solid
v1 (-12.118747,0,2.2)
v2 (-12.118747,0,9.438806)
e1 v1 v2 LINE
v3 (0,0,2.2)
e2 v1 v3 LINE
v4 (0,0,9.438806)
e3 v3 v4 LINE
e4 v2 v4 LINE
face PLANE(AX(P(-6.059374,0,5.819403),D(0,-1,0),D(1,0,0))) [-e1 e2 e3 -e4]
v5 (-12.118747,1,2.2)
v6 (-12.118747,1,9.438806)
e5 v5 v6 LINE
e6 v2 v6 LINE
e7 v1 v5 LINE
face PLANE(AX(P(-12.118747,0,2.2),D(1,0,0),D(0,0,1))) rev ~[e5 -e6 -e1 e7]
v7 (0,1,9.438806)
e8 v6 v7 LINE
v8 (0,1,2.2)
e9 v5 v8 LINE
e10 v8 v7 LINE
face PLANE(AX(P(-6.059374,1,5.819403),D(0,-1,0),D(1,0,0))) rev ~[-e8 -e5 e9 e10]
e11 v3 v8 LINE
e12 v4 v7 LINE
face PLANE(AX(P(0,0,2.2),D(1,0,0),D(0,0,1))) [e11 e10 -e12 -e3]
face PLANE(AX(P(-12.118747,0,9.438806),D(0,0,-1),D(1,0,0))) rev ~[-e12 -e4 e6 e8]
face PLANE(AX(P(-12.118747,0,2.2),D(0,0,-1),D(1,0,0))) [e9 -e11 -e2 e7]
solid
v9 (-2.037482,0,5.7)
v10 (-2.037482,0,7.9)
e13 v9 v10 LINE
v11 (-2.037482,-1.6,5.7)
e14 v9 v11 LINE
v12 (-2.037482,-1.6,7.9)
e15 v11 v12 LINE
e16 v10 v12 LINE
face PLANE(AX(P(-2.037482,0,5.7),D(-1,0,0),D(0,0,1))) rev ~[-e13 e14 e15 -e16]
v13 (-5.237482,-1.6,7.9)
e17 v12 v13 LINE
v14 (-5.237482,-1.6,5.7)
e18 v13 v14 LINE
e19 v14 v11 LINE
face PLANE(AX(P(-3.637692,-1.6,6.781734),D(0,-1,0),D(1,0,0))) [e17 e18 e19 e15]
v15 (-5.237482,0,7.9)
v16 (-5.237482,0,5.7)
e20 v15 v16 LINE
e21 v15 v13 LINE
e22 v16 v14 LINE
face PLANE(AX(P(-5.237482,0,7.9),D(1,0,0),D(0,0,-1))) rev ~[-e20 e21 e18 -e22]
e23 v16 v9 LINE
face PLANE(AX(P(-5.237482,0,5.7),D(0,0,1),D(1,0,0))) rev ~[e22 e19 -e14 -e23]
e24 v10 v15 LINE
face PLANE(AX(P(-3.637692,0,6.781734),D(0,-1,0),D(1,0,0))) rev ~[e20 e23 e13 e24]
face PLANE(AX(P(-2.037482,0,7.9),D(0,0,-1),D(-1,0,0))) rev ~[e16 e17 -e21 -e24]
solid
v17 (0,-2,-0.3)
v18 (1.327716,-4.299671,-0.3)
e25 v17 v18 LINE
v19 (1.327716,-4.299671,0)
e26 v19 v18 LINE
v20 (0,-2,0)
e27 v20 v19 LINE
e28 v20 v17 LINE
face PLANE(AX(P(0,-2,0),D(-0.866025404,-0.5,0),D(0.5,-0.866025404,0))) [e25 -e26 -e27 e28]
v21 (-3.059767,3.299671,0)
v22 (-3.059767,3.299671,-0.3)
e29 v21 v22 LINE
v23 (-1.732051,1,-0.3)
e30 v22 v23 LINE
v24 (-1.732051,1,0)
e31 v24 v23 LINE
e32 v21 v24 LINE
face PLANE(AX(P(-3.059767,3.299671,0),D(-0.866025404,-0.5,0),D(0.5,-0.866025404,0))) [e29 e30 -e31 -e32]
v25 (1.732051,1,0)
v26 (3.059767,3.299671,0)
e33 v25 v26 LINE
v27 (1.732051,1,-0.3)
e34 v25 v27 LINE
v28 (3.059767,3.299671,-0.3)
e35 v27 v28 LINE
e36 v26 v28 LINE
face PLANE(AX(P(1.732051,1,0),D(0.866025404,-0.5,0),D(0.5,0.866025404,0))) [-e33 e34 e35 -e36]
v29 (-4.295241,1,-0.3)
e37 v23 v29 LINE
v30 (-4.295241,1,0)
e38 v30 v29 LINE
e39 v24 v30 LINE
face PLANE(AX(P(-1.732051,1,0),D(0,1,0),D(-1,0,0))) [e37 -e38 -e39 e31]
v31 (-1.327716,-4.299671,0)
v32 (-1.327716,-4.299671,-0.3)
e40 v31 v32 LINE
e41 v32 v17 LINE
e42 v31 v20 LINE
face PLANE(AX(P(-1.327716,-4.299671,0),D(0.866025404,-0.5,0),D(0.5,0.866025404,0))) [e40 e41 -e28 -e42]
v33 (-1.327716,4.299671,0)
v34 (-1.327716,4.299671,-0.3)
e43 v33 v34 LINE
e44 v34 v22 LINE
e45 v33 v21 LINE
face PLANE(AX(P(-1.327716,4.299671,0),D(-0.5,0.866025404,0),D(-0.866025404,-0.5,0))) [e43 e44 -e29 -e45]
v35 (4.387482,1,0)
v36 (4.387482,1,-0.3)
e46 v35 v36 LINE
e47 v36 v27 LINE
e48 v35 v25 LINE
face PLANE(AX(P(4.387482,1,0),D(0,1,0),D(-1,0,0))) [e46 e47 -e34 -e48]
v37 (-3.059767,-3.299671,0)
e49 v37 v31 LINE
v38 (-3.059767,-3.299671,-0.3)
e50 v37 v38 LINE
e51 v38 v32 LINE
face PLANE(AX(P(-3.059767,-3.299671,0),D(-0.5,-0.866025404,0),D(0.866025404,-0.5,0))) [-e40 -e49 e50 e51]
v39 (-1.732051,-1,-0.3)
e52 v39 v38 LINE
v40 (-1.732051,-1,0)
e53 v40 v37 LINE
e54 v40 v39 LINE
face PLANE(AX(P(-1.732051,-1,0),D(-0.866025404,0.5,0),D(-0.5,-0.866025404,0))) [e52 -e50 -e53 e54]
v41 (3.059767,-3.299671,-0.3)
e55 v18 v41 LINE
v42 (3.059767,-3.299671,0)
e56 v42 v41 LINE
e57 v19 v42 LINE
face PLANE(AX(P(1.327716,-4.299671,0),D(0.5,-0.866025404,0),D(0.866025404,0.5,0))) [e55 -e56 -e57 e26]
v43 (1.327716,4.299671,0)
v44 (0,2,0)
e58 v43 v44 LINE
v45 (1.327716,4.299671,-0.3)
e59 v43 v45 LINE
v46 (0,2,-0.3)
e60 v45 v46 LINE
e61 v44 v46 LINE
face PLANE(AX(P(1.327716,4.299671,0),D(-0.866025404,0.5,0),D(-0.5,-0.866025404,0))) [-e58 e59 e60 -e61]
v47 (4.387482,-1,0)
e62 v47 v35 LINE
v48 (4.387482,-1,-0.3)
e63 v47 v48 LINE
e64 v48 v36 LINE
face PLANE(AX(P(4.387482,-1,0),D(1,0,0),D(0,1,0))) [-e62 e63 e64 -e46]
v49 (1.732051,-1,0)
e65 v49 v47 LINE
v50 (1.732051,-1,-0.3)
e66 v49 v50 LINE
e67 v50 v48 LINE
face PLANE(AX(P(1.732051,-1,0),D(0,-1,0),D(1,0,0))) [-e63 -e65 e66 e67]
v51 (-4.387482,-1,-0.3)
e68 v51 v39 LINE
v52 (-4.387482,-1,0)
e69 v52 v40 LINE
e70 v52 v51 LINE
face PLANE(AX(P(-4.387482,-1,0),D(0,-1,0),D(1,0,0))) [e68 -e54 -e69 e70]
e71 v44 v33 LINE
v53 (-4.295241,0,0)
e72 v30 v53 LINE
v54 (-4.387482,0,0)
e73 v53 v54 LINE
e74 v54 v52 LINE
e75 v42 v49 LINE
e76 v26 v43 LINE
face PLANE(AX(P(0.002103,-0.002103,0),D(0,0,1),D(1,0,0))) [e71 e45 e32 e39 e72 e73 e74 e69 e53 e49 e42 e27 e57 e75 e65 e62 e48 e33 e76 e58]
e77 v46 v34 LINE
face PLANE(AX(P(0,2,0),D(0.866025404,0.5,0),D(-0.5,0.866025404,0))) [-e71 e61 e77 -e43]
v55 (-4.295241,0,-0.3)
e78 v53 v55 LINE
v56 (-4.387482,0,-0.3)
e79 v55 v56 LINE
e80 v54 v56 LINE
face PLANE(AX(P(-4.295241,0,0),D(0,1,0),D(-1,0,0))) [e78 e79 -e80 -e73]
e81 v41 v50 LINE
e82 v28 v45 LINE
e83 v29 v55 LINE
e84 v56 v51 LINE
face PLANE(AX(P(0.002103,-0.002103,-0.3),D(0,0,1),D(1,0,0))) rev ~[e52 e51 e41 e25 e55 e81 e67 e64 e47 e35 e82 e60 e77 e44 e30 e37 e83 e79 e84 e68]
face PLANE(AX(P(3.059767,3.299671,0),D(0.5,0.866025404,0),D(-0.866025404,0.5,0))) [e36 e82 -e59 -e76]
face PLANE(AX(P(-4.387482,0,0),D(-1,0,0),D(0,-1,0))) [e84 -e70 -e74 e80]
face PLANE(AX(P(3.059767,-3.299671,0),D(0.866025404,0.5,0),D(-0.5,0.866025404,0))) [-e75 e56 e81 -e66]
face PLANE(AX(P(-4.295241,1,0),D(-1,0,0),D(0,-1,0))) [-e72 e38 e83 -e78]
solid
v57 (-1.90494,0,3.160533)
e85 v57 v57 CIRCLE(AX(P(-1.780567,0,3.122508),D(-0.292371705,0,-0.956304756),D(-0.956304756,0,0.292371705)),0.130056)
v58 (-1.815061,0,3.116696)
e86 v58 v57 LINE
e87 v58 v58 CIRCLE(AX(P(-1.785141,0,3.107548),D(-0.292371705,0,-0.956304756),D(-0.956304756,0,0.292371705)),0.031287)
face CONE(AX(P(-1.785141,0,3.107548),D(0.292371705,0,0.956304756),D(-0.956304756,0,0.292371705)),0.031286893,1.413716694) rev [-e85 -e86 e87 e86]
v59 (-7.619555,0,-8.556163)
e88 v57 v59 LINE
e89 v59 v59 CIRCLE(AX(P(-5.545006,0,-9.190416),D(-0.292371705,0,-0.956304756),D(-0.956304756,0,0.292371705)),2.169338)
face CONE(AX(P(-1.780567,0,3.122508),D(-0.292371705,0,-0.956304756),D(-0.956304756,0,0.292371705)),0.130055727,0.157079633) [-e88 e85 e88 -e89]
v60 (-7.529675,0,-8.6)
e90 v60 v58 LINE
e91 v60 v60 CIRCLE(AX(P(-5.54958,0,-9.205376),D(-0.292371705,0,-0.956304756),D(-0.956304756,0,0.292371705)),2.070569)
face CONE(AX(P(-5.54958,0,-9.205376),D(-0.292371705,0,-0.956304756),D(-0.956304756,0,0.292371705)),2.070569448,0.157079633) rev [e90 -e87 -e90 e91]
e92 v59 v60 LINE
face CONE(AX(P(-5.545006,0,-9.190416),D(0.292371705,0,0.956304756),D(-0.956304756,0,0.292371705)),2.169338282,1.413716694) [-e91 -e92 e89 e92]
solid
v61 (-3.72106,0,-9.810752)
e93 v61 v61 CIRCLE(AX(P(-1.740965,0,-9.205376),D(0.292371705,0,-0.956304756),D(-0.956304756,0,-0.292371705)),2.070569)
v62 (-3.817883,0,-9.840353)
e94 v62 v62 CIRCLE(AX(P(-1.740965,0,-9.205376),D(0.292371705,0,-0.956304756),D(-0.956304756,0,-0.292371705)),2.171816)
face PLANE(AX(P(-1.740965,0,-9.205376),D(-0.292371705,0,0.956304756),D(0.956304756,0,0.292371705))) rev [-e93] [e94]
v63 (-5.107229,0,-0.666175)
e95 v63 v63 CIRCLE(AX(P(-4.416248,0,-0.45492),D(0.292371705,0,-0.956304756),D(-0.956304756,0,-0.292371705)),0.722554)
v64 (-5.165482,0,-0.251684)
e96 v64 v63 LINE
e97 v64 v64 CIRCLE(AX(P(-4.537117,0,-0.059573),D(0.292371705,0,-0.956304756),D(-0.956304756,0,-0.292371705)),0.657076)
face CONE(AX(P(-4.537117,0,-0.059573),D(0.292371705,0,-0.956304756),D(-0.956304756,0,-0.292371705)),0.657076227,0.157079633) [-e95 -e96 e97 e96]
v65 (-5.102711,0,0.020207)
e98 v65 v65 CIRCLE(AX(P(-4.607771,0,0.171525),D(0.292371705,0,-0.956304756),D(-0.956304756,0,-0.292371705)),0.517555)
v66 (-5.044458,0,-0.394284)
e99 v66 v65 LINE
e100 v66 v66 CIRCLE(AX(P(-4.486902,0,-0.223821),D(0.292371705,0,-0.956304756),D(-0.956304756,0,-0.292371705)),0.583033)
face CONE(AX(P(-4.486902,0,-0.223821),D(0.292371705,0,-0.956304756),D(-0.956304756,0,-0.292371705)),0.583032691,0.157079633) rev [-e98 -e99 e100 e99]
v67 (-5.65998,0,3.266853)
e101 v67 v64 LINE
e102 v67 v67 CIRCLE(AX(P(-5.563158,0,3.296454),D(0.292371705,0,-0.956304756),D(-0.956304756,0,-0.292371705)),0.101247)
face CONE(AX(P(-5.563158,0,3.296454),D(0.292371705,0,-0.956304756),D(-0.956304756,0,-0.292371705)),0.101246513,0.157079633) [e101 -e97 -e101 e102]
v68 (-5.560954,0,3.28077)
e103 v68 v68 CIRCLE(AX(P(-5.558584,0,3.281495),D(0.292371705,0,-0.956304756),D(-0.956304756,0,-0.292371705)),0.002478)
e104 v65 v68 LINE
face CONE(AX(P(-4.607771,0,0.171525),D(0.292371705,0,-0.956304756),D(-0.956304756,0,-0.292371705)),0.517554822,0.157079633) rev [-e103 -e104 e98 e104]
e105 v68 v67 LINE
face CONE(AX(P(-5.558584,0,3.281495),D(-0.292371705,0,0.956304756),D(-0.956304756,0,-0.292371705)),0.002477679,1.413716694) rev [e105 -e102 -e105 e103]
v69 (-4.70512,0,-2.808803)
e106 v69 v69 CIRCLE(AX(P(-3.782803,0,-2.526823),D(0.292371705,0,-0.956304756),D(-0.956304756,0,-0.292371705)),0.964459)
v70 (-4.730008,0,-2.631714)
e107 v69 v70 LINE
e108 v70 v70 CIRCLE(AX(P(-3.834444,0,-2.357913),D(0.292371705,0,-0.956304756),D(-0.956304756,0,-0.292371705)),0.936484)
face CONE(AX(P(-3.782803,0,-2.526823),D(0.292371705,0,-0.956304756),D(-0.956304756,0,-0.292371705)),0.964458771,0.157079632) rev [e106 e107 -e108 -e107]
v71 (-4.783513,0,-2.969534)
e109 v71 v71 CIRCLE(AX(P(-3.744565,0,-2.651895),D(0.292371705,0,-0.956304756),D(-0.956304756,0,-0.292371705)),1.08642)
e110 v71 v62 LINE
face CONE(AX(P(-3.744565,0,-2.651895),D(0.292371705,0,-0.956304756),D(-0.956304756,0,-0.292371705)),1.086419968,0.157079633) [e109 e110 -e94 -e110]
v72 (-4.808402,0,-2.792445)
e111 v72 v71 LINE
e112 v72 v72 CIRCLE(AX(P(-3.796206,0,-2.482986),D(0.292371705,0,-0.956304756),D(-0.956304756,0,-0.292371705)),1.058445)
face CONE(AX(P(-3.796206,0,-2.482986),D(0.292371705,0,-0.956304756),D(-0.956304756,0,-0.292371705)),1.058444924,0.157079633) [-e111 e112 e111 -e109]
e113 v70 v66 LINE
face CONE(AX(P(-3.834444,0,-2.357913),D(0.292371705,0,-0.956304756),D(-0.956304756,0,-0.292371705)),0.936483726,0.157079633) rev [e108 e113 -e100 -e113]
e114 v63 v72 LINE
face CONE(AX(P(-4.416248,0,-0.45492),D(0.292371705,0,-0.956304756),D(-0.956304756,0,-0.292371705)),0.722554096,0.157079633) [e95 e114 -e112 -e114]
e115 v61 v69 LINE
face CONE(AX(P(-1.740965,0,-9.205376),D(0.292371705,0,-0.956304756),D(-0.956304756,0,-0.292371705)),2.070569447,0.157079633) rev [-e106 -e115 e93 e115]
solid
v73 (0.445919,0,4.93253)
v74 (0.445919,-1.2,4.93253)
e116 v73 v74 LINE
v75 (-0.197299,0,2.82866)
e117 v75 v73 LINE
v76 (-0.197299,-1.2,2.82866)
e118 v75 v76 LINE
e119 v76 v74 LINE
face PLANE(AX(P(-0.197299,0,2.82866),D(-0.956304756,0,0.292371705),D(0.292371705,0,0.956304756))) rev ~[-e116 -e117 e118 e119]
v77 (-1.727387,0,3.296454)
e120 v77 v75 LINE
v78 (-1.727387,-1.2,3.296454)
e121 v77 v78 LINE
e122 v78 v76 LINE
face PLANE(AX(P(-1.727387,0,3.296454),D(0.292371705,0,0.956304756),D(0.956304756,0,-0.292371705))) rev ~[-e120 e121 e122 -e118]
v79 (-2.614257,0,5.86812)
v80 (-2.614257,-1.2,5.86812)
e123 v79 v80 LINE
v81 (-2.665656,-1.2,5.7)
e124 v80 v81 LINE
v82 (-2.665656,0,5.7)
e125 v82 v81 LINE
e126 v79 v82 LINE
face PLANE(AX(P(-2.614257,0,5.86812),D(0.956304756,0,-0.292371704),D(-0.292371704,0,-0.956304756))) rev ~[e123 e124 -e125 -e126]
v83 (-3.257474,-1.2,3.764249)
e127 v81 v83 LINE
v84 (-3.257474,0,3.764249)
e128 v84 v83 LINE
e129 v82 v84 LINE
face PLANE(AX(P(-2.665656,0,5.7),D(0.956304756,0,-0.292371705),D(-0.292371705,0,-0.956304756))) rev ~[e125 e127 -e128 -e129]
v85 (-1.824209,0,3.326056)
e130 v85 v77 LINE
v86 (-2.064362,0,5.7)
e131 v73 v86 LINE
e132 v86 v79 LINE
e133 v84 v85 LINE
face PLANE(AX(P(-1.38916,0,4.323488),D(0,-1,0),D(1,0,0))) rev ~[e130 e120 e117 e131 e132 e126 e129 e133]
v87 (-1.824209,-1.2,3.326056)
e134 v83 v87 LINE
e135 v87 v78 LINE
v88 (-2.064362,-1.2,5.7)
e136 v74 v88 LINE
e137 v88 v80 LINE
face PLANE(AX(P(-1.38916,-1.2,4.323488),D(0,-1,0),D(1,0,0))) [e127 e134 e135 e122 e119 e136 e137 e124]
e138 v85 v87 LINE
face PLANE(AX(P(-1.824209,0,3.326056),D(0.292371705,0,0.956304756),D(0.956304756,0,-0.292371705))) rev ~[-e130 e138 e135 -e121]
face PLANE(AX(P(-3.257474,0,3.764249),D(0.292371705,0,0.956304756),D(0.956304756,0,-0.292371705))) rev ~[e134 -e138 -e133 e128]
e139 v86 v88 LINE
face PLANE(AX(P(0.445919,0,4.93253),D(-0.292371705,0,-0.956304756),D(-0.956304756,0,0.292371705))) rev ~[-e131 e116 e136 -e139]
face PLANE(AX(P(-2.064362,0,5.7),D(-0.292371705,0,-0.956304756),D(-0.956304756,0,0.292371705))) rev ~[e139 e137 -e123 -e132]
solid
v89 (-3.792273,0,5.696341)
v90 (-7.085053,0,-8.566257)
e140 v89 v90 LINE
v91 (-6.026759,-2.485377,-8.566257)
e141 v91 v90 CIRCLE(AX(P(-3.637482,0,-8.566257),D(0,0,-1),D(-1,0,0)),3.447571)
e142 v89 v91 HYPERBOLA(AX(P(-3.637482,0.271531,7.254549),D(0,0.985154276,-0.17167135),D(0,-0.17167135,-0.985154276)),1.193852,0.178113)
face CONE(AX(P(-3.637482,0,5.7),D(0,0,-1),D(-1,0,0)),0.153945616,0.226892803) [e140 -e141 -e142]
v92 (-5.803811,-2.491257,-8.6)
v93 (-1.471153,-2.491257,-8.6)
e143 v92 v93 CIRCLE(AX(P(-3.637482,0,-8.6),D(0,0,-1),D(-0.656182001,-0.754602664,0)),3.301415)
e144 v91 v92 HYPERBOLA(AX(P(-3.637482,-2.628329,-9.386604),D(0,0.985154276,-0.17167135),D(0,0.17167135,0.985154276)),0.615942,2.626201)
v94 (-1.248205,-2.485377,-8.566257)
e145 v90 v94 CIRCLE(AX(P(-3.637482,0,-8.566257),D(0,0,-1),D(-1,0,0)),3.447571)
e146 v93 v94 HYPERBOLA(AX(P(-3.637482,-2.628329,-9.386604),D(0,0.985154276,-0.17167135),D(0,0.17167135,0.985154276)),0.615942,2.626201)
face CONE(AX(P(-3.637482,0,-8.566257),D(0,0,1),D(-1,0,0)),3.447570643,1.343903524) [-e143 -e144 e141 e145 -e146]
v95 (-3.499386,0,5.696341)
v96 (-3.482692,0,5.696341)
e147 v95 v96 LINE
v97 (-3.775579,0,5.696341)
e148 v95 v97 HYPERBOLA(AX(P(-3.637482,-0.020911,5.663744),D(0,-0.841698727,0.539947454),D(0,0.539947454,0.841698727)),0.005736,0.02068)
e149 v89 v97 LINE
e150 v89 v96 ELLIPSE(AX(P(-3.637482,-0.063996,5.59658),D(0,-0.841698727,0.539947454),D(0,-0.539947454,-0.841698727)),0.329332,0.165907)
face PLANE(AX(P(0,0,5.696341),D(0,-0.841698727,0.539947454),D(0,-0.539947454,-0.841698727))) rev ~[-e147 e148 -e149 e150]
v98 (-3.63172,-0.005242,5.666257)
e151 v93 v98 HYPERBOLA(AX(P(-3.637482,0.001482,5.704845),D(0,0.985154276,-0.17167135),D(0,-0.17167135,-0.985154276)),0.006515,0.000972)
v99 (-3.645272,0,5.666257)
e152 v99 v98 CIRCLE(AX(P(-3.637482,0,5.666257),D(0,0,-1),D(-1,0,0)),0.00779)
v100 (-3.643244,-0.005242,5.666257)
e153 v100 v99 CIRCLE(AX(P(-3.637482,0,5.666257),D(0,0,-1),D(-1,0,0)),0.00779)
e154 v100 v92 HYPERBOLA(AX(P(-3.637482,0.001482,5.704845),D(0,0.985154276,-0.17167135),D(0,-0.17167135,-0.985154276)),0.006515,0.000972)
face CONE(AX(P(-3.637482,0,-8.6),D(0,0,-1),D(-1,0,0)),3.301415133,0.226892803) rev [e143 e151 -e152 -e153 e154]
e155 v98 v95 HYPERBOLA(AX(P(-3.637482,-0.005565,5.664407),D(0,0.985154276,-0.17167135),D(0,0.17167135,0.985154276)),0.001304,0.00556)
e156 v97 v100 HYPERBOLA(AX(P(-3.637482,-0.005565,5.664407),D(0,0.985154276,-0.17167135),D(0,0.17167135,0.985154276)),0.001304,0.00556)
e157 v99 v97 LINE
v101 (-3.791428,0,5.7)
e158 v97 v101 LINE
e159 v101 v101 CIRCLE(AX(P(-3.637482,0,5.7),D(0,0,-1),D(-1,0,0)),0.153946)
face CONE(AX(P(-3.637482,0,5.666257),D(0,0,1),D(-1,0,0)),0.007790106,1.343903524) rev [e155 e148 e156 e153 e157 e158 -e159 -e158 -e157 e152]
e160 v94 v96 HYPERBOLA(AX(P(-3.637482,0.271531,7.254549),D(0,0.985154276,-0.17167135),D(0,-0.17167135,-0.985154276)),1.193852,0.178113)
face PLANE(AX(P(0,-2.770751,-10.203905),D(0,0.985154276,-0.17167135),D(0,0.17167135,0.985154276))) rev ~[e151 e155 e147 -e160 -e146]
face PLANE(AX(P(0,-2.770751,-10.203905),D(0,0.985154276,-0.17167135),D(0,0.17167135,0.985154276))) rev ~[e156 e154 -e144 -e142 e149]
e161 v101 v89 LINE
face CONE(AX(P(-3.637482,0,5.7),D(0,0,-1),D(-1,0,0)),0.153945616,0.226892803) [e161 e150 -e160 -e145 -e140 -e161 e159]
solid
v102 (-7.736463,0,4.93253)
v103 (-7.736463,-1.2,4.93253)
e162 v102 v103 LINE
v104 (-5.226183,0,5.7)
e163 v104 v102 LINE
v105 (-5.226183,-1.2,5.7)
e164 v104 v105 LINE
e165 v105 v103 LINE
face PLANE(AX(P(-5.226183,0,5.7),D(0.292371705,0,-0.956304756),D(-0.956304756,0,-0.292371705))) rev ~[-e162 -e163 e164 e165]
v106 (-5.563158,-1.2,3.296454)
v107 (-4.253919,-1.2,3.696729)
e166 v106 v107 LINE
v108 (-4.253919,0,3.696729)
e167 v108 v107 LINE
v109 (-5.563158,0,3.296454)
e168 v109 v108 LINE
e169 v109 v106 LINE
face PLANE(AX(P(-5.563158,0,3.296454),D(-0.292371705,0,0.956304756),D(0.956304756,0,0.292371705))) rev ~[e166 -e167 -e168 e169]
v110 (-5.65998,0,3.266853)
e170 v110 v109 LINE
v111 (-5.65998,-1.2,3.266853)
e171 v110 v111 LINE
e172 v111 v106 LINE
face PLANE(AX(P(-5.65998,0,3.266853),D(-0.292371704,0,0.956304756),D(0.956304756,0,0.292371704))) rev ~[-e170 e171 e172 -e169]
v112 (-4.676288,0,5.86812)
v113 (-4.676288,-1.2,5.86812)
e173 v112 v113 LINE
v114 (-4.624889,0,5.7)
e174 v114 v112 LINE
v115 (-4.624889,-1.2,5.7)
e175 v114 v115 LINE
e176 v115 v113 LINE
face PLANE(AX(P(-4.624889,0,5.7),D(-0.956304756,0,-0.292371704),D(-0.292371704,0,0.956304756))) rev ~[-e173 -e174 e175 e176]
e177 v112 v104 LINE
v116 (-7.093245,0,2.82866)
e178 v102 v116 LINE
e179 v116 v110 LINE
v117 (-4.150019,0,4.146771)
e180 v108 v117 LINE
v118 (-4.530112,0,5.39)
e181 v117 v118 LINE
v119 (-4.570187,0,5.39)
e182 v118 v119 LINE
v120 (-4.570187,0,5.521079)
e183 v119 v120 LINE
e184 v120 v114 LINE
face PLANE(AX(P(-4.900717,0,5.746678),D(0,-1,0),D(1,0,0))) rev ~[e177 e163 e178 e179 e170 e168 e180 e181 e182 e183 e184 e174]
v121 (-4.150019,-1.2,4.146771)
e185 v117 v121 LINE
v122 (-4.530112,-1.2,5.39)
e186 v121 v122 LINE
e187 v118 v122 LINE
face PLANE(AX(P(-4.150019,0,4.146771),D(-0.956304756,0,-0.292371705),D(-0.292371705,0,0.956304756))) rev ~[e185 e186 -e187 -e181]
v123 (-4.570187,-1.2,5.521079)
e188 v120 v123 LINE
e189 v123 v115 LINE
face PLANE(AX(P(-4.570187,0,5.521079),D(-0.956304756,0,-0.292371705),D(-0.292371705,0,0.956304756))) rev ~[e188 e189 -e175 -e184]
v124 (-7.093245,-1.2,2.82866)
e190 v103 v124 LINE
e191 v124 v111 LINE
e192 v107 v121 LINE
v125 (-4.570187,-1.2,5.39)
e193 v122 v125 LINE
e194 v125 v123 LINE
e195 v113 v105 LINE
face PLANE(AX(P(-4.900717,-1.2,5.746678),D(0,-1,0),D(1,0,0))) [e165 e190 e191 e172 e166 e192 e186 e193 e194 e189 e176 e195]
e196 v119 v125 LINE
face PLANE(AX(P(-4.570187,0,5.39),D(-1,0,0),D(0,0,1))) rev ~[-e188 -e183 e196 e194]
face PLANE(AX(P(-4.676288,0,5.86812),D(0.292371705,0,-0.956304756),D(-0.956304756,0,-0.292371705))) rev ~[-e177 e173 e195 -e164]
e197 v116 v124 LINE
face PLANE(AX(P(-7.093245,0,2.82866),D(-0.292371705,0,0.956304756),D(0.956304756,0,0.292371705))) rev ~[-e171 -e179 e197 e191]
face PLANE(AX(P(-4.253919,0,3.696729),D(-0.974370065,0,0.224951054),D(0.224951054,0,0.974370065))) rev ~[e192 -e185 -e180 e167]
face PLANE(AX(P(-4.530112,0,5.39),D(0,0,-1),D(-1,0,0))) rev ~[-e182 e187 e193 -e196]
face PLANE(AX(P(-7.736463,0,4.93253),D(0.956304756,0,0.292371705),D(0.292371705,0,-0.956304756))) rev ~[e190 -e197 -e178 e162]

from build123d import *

# Parameters (mm, degrees)
F3_DEPTH  = 0.3
F6_DEPTH  = 1.2
F7_DEPTH  = 1.6
F8_W      = 12.1187474579
F8_H      = 7.2388057597
F9_DEPTH  = 1
F13_DEPTH = 12.5


# Not quite as in the source:
# - a feature names something its author has since deleted; it is built from what else it names


with BuildPart() as f2:
    # F1 (on Front) → F2 (revolve)
    with BuildSketch(Plane.XZ):
        Polygon((-3.7210601673, -9.810751838), (-4.7051198674, -2.8088032427), (-4.7835134136, -2.9695338315), (-3.8178826888, -9.8403534535), align=None)
        Polygon((-5.1072294295, -0.6661746932), (-5.044458455, -0.3942837314), (-5.1027113349, 0.0202070469), (-5.1654823095, -0.2516839149), align=None)
        Polygon((-4.7051198674, -2.8088032427), (-4.7300080769, -2.6317144309), (-4.808401623, -2.7924450197), (-4.7835134136, -2.9695338315), align=None)
        Polygon((-5.1654823095, -0.2516839149), (-5.1027113349, 0.0202070469), (-5.5609535977, 3.280770169), (-5.6599804046, 3.2668528589), align=None)
        Polygon((-4.808401623, -2.7924450197), (-4.7300080769, -2.6317144309), (-5.044458455, -0.3942837314), (-5.1072294295, -0.6661746932), align=None)
    revolve(axis=Axis((-5.5178402688, 0, 3.1482272372), (0.2923717047, 0, -0.956304756)))


with BuildPart() as f3:
    # F0 (on Top) → F3 (new body)
    with BuildSketch(Plane.XY):
        Polygon((-3.0597665006, 3.2996710384), (-1.7320508076, 1), (-4.295240622, 1), (-4.295240622, 0), (-4.3874821937, 0), (-4.3874821937, -1), (-1.7320508076, -1), (-3.0597665006, -3.2996710384), (-1.3277156931, -4.2996710384), (0, -2), (1.3277156931, -4.2996710384), (3.0597665006, -3.2996710384), (1.7320508076, -1), (4.3874821937, -1), (4.3874821937, 1), (1.7320508076, 1), (3.0597665006, 3.2996710384), (1.3277156931, 4.2996710384), (0, 2), (-1.3277156931, 4.2996710384), align=None)
    extrude(amount=-F3_DEPTH)


with BuildPart() as f5:
    # F4 (on Front) → F5 (revolve)
    with BuildSketch(Plane.XZ):
        Polygon((-3.6452723001, 5.6662573418), (-3.7914278099, 5.7), (-7.0850528365, -8.5662573418), (-6.9388973268, -8.6), align=None)
    revolve(axis=Axis((-3.6374821937, 0, 5.545), (0, 0, -1)))

    # F12 (on Right) → F13 (cut, symmetric)
    with BuildSketch(Plane.YZ):
        Polygon((-2.7707505506, -10.2039054036), (0, 5.6963409297), (-10.1999649778, -10.2039054036), align=None)
    extrude(amount=F13_DEPTH, both=True, mode=Mode.SUBTRACT)


with BuildPart() as f6:
    # F1 (on Front) → F6 (new body)
    with BuildSketch(Plane.XZ):
        Polygon((-5.2261826705, 5.7), (-4.6248886842, 5.7), (-4.6762880239, 5.868119665), align=None)
        Polygon((-4.5701869432, 5.5210786674), (-4.6248886842, 5.7), (-5.2261826705, 5.7), (-7.736463243, 4.9325302099), (-7.0932454926, 2.8286597468), (-5.6599804046, 3.2668528589), (-5.5631578831, 3.2964544743), (-4.2539193968, 3.6967288489), (-4.1500189554, 4.1467711043), (-4.5301121729, 5.39), (-4.5701869432, 5.39), align=None)
    extrude(amount=F6_DEPTH)


with BuildPart() as f6b:
    # F1 (on Front) → F6, piece 2 (new body)
    with BuildSketch(Plane.XZ):
        Polygon((-2.0643619298, 5.7), (-2.6656559161, 5.7), (-3.2574743268, 3.7642492019), (-1.8242092387, 3.3260560898), (-1.7273867172, 3.2964544743), (-0.1972991077, 2.8286597468), (0.4459186427, 4.9325302099), align=None)
        Polygon((-2.6142565764, 5.868119665), (-2.6656559161, 5.7), (-2.0643619298, 5.7), align=None)
    extrude(amount=F6_DEPTH)


with BuildPart() as f7:
    # F1 (on Front) → F7 (new body)
    with BuildSketch(Plane.XZ):
        Polygon((-3.6374821937, 5.7), (-2.9229645152, 5.7), (-2.6656559161, 5.7), (-2.6142565764, 5.868119665), (-2.0643619298, 5.7), (-2.0374821937, 5.7), (-2.0374821937, 7.9), (-5.2374821937, 7.9), (-5.2374821937, 6.6), (-5.2374821937, 5.7), (-5.2261826705, 5.7), (-4.6762880239, 5.868119665), (-4.6248886842, 5.7), (-4.5701869432, 5.7), (-3.7914278099, 5.7), align=None)
        Polygon((-2.6142565764, 5.868119665), (-2.6656559161, 5.7), (-2.0643619298, 5.7), align=None)
        Polygon((-5.2261826705, 5.7), (-4.6248886842, 5.7), (-4.6762880239, 5.868119665), align=None)
    extrude(amount=F7_DEPTH)


with BuildPart() as f9:
    # F8 (on Front) → F9 (new body)
    with BuildSketch(Plane.XZ):
        with Locations((-6.0593737289, 5.8194028798)):
            Rectangle(F8_W, F8_H)
    extrude(amount=-F9_DEPTH)


with BuildPart() as f11:
    # F10 (on Front) → F11 (revolve)
    with BuildSketch(Plane.XZ):
        Polygon((-1.8150609466, 3.1166956651), (-1.9049403512, 3.1605327798), (-7.6195546574, -8.5561628853), (-7.5296752528, -8.6), align=None)
    revolve(axis=Axis((-1.7727043315, 0, 3.1482272372), (-0.2923717047, 0, -0.956304756)))


solid = Compound([f2.part, f3.part, f5.part, f6.part, f6b.part, f7.part, f9.part, f11.part])
